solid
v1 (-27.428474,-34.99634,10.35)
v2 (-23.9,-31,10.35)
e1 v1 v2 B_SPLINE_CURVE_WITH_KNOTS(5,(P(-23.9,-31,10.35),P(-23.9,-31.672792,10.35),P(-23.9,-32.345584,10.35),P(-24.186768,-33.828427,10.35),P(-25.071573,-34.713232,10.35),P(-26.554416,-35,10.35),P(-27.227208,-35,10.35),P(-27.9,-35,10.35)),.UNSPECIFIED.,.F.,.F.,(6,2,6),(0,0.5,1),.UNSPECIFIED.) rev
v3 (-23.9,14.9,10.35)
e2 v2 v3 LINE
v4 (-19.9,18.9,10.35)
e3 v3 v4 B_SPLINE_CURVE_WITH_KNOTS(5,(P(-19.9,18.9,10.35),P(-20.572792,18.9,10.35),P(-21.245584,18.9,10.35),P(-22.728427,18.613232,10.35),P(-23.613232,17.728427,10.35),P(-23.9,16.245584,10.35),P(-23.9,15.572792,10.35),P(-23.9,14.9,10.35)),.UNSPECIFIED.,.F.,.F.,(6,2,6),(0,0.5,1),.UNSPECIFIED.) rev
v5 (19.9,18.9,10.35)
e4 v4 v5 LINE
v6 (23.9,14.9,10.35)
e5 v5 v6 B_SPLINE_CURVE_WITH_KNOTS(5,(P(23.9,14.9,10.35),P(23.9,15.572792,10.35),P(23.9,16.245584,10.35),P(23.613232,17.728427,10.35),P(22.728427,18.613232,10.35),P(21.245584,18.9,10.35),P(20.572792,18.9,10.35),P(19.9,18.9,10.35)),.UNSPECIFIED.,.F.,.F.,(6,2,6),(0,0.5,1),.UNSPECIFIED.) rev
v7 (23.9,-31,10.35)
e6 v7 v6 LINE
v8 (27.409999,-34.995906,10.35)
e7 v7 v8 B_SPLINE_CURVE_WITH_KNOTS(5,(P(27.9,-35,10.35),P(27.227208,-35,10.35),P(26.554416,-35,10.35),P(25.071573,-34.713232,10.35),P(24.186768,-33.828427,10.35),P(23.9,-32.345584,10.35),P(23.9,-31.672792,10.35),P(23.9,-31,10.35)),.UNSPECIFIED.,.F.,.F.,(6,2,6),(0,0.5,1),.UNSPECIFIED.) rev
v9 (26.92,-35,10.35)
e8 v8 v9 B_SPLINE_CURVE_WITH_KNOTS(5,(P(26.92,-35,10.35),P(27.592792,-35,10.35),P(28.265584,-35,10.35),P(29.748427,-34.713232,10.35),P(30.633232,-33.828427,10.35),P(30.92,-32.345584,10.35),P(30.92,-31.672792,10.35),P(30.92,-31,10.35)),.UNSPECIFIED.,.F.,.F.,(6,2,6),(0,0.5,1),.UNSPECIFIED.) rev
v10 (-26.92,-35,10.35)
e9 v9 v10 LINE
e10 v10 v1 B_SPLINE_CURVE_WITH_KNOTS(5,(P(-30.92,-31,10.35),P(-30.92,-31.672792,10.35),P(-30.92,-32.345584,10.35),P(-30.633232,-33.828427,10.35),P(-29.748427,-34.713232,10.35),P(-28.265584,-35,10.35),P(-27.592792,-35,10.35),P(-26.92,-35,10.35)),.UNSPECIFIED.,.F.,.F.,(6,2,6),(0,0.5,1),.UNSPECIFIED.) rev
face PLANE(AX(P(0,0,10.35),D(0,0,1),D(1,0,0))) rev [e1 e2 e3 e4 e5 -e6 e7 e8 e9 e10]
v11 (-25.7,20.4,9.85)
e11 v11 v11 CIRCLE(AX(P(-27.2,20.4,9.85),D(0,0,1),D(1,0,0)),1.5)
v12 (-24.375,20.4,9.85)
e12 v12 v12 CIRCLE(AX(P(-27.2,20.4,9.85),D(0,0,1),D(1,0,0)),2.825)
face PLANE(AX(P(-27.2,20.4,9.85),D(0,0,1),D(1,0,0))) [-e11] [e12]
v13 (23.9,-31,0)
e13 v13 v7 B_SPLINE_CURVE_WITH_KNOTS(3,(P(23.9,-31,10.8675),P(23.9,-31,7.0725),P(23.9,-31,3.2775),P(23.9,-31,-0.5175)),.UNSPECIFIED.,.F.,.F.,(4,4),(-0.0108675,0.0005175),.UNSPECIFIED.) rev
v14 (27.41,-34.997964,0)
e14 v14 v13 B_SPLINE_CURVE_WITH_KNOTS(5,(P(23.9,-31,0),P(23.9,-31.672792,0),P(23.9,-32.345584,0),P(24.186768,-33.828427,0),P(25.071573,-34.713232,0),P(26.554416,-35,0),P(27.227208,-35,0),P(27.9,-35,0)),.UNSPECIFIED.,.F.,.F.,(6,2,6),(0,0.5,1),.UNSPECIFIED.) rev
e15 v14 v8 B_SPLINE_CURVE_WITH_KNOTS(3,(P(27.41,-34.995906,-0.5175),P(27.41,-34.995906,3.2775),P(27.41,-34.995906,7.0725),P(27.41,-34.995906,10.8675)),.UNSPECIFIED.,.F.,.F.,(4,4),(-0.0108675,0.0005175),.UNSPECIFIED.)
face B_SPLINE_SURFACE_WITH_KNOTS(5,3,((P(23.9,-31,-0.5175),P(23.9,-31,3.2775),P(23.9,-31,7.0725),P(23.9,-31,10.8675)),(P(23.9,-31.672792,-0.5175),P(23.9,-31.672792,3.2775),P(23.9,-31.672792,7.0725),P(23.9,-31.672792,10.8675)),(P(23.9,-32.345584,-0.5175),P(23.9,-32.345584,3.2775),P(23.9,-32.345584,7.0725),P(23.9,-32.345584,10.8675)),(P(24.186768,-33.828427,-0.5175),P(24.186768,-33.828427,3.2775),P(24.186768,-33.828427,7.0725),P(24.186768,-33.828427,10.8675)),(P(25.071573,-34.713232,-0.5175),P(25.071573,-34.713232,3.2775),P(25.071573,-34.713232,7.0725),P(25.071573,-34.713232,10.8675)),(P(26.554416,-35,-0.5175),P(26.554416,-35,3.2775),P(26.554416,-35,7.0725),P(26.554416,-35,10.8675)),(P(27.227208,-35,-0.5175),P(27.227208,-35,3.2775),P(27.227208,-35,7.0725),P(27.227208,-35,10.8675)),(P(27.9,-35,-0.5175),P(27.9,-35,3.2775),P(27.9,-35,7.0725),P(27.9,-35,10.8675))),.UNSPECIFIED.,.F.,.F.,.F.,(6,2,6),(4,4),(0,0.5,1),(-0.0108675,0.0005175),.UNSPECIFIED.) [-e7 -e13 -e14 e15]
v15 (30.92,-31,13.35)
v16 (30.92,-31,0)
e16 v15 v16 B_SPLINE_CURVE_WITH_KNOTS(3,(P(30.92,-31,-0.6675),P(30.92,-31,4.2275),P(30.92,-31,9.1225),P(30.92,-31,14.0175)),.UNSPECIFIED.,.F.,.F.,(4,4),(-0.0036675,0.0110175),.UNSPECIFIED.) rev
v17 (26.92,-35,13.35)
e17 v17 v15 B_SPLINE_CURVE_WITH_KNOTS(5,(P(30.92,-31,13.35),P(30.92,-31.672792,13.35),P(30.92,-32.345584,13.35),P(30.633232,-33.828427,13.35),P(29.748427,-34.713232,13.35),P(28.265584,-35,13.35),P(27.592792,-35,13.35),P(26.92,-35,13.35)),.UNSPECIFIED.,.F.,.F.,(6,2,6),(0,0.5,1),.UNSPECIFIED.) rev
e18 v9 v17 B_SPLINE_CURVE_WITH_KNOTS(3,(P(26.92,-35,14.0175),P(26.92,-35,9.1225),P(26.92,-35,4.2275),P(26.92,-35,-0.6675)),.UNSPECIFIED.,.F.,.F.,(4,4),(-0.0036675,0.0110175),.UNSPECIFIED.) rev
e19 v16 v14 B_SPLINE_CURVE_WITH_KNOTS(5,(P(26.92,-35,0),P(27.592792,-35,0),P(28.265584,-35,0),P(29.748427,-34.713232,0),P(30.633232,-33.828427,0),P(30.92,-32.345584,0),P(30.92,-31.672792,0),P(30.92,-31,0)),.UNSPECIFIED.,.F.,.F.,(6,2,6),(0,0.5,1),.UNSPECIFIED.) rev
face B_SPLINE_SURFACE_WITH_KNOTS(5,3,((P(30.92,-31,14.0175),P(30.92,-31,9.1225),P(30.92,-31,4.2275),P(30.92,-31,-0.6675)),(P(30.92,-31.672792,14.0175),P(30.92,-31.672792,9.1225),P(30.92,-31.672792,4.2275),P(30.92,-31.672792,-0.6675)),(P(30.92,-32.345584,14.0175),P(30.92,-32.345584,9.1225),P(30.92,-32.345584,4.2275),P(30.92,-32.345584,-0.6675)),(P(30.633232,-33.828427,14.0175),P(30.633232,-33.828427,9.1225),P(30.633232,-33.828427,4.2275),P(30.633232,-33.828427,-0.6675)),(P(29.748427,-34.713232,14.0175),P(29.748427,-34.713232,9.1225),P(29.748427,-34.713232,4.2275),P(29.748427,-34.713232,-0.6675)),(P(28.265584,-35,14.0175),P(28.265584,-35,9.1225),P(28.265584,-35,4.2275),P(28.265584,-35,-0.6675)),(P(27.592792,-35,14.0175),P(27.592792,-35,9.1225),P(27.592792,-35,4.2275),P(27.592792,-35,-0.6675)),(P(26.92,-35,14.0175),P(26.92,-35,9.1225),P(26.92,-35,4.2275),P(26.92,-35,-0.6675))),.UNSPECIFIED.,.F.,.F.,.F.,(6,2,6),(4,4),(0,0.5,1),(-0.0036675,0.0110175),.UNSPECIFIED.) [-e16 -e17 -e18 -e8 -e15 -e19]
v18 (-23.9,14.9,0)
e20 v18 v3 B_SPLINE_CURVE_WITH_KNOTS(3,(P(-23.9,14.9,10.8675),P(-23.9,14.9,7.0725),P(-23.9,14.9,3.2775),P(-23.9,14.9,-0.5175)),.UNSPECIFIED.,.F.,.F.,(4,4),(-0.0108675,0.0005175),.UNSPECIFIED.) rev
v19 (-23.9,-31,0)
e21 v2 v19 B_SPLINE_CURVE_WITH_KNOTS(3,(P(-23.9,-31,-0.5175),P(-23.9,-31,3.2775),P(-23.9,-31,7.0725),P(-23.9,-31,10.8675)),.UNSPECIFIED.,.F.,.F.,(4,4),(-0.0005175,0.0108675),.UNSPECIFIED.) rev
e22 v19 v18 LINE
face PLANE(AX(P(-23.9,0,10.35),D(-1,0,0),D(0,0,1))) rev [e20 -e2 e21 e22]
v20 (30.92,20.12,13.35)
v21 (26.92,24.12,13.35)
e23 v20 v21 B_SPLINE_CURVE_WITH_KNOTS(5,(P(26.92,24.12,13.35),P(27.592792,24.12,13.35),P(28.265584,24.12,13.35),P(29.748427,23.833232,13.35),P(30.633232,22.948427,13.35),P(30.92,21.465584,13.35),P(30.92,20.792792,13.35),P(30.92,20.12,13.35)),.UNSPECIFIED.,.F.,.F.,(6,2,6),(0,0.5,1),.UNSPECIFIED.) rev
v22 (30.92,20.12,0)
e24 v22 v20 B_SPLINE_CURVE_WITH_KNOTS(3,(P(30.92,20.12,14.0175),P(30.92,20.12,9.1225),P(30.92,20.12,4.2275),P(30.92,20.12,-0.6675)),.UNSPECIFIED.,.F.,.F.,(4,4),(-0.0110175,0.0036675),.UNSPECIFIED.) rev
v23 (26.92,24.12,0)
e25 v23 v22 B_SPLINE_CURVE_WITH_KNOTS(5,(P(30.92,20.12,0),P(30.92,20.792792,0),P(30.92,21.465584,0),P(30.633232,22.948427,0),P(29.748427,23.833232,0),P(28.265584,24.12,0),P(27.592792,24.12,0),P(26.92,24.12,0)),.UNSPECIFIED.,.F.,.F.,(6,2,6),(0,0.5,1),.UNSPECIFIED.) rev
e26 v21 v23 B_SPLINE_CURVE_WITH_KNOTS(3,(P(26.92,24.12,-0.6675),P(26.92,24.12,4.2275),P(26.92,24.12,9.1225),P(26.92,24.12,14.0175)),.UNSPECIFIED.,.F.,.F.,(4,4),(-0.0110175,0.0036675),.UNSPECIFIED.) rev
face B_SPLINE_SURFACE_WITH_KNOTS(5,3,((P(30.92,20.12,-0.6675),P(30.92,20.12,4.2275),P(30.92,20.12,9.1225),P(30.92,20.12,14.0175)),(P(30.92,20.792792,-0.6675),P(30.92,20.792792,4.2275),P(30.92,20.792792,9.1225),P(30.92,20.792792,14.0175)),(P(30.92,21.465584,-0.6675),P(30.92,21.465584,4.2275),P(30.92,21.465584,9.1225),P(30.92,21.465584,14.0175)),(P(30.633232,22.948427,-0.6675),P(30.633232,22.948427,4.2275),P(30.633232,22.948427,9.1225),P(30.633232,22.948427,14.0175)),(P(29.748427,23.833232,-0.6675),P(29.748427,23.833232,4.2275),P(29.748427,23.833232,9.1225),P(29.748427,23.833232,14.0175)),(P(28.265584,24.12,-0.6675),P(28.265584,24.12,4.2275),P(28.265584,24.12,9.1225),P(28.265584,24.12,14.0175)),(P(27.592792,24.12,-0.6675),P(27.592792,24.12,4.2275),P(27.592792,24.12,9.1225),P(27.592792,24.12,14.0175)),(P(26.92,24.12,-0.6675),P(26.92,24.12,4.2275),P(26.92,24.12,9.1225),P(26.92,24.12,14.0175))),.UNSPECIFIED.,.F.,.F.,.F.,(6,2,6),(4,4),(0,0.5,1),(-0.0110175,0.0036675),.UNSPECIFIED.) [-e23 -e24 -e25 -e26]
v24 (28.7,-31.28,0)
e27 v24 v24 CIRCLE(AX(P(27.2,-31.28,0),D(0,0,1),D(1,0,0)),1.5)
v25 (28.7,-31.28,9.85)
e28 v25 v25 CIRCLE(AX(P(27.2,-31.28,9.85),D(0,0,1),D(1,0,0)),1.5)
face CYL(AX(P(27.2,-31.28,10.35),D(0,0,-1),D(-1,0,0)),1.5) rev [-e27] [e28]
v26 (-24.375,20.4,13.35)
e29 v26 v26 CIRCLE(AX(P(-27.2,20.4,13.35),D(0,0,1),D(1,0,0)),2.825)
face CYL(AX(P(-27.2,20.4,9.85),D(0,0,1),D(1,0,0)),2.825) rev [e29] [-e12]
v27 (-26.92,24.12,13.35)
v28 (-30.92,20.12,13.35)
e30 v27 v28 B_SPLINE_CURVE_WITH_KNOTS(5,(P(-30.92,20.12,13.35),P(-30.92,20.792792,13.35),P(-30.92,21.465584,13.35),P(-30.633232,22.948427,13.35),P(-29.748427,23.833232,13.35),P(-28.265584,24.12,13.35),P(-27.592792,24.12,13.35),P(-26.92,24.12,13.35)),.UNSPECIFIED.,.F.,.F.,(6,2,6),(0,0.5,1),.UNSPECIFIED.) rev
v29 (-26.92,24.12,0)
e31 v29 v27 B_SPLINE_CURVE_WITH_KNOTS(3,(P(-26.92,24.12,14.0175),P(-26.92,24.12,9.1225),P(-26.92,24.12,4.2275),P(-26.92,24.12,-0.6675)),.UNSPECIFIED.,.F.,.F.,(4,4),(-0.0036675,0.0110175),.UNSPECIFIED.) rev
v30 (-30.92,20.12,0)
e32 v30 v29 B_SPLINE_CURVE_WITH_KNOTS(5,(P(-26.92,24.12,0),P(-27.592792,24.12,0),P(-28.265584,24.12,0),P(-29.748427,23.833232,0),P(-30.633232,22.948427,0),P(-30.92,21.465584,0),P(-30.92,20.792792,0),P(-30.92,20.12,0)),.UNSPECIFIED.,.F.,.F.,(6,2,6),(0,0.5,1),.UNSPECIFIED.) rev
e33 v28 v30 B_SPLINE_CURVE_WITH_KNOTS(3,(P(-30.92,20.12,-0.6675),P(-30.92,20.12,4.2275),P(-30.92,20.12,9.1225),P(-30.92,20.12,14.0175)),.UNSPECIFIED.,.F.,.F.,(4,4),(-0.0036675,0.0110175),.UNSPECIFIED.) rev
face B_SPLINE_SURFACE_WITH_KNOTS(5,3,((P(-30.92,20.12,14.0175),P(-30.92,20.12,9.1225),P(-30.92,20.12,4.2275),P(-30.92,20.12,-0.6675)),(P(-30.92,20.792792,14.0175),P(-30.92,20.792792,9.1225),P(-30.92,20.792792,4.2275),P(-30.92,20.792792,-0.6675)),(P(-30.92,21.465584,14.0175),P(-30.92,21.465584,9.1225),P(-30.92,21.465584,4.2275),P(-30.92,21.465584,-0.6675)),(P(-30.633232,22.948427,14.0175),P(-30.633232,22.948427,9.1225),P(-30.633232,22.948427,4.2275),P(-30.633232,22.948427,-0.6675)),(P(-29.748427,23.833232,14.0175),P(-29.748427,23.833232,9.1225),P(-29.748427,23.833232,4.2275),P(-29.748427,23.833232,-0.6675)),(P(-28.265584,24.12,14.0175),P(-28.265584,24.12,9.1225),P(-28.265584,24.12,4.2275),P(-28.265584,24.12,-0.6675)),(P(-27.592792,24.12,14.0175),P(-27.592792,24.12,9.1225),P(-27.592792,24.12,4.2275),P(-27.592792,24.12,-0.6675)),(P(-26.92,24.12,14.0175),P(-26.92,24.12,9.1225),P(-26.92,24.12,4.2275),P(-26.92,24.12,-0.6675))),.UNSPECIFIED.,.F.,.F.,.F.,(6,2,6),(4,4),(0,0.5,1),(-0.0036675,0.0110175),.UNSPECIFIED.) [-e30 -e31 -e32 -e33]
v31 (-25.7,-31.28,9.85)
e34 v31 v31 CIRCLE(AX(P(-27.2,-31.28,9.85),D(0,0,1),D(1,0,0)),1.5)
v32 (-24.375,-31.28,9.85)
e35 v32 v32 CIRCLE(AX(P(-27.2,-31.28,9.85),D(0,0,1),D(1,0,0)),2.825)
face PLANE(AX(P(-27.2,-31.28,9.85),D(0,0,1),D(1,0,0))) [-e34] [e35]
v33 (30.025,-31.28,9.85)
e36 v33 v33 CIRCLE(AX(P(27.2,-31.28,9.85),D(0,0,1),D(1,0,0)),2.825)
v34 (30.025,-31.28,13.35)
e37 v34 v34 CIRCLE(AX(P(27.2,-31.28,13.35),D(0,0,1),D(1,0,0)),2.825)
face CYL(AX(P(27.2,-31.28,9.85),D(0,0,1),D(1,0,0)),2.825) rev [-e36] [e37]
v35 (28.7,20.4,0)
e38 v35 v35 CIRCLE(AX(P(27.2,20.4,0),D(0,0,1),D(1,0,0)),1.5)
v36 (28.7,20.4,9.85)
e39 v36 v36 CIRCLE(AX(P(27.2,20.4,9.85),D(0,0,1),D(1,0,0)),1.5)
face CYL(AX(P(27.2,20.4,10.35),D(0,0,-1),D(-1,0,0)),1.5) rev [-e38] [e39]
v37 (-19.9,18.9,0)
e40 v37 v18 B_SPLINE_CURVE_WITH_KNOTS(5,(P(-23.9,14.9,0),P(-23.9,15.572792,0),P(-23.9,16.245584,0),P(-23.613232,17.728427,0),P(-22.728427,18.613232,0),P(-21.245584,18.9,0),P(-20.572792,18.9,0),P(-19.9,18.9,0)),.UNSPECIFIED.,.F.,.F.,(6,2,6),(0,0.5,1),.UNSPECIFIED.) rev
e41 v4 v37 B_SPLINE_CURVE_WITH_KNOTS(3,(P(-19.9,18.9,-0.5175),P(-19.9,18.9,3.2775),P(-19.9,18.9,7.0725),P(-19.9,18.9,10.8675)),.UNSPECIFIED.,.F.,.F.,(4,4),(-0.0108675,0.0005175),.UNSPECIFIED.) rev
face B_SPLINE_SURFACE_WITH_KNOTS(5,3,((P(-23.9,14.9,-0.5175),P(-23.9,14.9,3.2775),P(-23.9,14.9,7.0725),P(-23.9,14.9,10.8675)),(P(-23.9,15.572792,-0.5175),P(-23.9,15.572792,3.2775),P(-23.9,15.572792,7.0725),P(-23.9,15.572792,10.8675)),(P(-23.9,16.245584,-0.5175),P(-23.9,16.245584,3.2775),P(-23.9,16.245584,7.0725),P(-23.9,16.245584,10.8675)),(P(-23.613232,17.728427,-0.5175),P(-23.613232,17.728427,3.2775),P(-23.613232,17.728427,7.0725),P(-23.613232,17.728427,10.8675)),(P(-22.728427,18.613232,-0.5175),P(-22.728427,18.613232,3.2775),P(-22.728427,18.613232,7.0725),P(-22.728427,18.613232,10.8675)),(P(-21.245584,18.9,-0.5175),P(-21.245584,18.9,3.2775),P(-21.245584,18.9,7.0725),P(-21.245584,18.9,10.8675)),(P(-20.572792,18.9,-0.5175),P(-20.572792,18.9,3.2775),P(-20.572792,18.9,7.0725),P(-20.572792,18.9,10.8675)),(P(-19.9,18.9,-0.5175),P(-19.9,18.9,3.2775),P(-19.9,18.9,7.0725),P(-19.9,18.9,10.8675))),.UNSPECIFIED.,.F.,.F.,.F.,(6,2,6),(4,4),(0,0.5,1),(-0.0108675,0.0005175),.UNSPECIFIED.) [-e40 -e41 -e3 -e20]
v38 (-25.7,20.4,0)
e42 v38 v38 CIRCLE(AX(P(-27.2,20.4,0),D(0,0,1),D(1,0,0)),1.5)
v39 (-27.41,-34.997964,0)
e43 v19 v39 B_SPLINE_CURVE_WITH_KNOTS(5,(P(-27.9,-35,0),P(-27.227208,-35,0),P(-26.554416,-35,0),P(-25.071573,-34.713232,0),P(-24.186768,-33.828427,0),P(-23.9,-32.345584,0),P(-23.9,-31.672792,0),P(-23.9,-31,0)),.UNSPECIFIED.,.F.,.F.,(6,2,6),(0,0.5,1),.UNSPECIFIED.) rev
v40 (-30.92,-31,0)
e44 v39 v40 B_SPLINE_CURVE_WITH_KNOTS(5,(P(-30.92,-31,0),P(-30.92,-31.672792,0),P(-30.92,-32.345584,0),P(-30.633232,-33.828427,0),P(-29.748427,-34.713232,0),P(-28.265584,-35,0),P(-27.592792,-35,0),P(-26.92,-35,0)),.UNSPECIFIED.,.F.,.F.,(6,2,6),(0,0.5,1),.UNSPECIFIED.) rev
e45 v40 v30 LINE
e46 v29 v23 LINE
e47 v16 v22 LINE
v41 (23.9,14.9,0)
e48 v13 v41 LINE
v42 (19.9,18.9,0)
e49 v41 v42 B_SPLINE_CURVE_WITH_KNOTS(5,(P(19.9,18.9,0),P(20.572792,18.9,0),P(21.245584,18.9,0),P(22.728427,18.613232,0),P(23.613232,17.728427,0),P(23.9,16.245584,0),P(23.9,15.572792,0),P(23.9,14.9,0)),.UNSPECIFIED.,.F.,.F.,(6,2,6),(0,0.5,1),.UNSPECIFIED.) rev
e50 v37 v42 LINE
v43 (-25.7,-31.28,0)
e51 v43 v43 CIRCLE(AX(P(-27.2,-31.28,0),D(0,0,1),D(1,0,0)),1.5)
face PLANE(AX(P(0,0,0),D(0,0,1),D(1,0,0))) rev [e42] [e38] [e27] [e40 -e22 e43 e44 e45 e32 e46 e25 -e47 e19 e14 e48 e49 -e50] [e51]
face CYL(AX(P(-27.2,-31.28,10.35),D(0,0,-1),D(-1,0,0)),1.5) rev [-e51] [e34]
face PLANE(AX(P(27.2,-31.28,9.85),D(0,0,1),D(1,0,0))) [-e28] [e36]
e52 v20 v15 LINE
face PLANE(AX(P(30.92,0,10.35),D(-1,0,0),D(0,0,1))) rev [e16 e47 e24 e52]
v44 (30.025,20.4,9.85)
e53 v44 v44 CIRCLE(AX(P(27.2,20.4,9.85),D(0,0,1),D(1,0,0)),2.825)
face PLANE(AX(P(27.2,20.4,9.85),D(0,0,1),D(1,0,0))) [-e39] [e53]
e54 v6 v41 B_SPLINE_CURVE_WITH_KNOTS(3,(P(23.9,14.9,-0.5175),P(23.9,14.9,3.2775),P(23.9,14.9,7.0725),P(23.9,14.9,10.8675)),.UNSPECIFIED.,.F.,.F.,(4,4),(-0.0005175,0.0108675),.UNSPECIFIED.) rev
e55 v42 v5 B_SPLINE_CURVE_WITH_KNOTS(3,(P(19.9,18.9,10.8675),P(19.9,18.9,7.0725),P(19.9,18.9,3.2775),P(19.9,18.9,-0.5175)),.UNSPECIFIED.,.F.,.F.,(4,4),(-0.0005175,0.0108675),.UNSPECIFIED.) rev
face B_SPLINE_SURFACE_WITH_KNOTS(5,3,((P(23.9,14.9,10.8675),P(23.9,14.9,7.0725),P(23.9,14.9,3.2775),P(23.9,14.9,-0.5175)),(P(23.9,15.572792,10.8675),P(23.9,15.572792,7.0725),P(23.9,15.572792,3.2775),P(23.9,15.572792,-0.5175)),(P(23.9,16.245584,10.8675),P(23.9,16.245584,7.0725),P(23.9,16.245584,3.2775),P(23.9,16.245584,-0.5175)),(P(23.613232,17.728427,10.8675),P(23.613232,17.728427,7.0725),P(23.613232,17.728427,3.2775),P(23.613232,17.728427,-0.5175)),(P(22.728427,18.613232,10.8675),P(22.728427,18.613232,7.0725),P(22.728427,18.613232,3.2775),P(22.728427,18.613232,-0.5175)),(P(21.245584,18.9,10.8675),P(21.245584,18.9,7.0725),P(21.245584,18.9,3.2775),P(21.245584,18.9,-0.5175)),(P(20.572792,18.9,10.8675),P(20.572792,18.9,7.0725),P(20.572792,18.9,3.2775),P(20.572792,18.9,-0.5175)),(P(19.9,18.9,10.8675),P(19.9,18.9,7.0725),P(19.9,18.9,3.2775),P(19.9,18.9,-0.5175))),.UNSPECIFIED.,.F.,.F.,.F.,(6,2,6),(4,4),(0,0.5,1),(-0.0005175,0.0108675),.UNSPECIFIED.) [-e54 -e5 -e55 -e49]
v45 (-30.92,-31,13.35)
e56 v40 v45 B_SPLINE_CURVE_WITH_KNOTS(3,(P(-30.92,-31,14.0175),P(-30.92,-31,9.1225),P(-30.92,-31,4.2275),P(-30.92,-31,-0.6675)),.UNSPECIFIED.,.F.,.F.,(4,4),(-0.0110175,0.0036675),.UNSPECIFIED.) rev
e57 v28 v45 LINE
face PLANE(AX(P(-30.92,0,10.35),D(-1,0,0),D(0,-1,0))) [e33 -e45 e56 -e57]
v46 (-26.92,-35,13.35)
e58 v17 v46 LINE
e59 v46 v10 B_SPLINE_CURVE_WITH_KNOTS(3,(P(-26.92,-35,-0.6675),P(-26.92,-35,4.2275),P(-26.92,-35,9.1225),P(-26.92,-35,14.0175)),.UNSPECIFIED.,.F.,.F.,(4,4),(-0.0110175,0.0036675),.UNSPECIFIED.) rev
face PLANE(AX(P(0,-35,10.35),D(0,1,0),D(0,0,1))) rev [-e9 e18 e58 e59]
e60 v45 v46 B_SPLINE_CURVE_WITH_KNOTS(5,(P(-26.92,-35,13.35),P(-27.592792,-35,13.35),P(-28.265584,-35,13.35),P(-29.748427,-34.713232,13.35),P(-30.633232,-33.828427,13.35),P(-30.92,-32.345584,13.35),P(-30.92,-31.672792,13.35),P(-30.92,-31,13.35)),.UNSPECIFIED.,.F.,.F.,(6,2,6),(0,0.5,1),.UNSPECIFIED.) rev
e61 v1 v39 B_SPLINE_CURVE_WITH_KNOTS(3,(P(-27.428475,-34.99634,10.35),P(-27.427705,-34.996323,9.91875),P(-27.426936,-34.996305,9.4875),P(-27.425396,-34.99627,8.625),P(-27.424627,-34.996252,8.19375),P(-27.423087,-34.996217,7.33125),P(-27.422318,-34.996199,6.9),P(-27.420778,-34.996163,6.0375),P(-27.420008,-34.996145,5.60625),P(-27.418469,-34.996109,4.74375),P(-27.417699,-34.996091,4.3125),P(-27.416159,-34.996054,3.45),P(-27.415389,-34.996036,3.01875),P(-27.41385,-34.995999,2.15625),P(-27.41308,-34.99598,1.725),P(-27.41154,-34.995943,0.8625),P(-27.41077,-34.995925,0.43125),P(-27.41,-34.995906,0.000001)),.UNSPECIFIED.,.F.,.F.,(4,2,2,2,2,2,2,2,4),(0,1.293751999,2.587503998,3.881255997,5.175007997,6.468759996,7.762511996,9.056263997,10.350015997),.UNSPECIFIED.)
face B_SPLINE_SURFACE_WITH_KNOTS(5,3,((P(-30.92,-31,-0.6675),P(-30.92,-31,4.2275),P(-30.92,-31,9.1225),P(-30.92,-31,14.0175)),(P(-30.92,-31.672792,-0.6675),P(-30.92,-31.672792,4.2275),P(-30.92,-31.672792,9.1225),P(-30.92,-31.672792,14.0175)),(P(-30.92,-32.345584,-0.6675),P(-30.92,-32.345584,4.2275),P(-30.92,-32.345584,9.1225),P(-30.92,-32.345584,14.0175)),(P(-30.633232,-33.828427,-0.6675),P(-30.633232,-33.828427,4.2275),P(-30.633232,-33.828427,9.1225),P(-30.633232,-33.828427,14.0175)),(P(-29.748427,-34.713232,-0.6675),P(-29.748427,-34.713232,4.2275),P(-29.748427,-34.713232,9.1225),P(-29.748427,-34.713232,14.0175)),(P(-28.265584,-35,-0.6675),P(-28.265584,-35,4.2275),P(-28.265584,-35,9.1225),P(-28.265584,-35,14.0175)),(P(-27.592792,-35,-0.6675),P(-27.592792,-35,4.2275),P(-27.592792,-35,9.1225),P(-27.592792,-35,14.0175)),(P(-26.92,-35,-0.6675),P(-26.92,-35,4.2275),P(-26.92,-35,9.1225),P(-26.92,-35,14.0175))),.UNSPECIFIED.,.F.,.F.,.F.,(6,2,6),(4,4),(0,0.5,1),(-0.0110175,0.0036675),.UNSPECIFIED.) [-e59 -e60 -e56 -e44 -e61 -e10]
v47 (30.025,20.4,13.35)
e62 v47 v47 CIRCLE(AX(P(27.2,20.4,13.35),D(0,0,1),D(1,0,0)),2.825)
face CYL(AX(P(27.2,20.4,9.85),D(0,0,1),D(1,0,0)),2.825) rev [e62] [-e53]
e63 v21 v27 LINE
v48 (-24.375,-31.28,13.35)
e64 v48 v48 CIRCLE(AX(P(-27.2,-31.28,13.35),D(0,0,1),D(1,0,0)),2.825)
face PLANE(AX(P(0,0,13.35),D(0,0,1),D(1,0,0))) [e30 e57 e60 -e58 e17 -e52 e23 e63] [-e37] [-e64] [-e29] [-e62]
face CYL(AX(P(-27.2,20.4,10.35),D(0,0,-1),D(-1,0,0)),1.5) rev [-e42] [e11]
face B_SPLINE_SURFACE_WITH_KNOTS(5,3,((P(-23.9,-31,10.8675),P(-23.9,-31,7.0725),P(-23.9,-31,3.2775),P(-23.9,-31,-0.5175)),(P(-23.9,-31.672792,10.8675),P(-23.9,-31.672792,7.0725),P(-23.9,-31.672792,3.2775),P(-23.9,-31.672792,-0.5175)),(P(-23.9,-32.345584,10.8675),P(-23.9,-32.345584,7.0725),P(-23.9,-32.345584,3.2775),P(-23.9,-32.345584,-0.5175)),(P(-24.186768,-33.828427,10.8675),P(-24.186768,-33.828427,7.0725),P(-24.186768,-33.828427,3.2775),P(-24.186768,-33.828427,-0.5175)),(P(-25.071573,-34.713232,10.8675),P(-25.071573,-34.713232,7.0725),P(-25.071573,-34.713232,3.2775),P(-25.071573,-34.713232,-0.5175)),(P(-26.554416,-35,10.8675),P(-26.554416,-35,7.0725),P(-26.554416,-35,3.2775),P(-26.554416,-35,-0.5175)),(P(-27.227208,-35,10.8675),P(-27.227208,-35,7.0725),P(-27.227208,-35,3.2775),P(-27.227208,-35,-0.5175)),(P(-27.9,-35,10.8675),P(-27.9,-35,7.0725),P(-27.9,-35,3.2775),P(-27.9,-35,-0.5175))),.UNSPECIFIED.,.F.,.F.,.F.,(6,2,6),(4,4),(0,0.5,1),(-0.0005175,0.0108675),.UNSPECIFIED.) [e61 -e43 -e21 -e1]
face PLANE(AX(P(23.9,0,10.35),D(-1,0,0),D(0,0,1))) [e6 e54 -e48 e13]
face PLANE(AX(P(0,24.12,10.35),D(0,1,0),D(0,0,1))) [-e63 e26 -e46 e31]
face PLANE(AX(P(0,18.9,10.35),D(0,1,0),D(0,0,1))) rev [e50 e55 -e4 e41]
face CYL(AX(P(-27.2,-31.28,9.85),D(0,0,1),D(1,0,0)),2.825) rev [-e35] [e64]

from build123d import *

# Parameters (mm, degrees)
SKETCH2_R           = 1.5
BOSS_EXTRUDE1_DEPTH = 10.35
BOSS_EXTRUDE2_START = 10.35
SKETCH2_3_R         = 1.5
BOSS_EXTRUDE2_DEPTH = 3
FILLET1_SIZE        = 4
FILLET2_SIZE        = 4
SKETCH7_R           = 2.825
CUT_EXTRUDE1_DEPTH  = 3.5


with BuildPart() as part:
    # Sketch2 → Boss-Extrude1 (new body)
    with BuildSketch(Plane.XY):
        Polygon((-30.92, -35), (-23.9, -35), (-23.9, 18.9), (23.9, 18.9), (23.9, -35), (30.92, -35), (30.92, 24.12), (-30.92, 24.12), align=None)
        with Locations((-27.2, -31.28)):
            Circle(SKETCH2_R, mode=Mode.SUBTRACT)
        with Locations((27.2, -31.28)):
            Circle(SKETCH2_R, mode=Mode.SUBTRACT)
        with Locations((-27.2, 20.4)):
            Circle(SKETCH2_R, mode=Mode.SUBTRACT)
        with Locations((27.2, 20.4)):
            Circle(SKETCH2_R, mode=Mode.SUBTRACT)
    extrude(amount=BOSS_EXTRUDE1_DEPTH)

    # Sketch2<3> → Boss-Extrude2 (add)
    # profile 1 of 2: a face of its own
    with BuildSketch(Plane.XY.offset(BOSS_EXTRUDE2_START)):
        Polygon((-30.92, -35), (-23.9, -35), (-23.9, 18.9), (23.9, 18.9), (23.9, -35), (30.92, -35), (30.92, 24.12), (-30.92, 24.12), align=None)
        with Locations((-27.2, -31.28)):
            Circle(SKETCH2_3_R, mode=Mode.SUBTRACT)
        with Locations((27.2, -31.28)):
            Circle(SKETCH2_3_R, mode=Mode.SUBTRACT)
        with Locations((-27.2, 20.4)):
            Circle(SKETCH2_3_R, mode=Mode.SUBTRACT)
        with Locations((27.2, 20.4)):
            Circle(SKETCH2_3_R, mode=Mode.SUBTRACT)
    # profile 2 of 2: a face of its own
    with BuildSketch(Plane.XY.offset(BOSS_EXTRUDE2_START)):
        Polygon((-23.9, -35), (-16, -35), (16, -35), (23.9, -35), (23.9, 18.9), (-23.9, 18.9), align=None)
    extrude(amount=BOSS_EXTRUDE2_DEPTH)

    # Fillet1
    # a fillet whose section is not a circle: 4 mm, written as the material it adds along each edge
    with BuildSketch(Plane(origin=(-23.9, 18.9, 0), x_dir=(0, -1, 0), z_dir=(0, 0, 1))) as fillet1_piece_1_section:
        with BuildLine():
            add(Edge.make_bspline([(FILLET1_SIZE, 0), (FILLET1_SIZE * 0.831801948466, 0), (FILLET1_SIZE * 0.663603896932, 0), (FILLET1_SIZE * 0.292893218813, FILLET1_SIZE * 0.0716919198361), (FILLET1_SIZE * 0.0716919198361, FILLET1_SIZE * 0.292893218813), (0, FILLET1_SIZE * 0.663603896932), (0, FILLET1_SIZE * 0.831801948466), (0, FILLET1_SIZE)], knots=[0, 0, 0, 0, 0, 0, 0.5, 0.5, 1, 1, 1, 1, 1, 1], degree=5))
            Line((0, FILLET1_SIZE), (0, 0))
            Line((0, 0), (FILLET1_SIZE, 0))
        make_face()
    fillet1_piece_1 = extrude(amount=20.35, mode=Mode.PRIVATE)
    fillet1_piece_1 = split(fillet1_piece_1, bisect_by=Plane(origin=(-23.9, 18.9, 13.35), z_dir=(0, 0, -1)), keep=Keep.TOP, mode=Mode.PRIVATE)
    add(fillet1_piece_1)
    with BuildSketch(Plane(origin=(23.9, 18.9, 0), x_dir=(-1, 0, 0), z_dir=(0, 0, 1))) as fillet1_piece_2_section:
        with BuildLine():
            add(Edge.make_bspline([(FILLET1_SIZE, 0), (FILLET1_SIZE * 0.831801948466, 0), (FILLET1_SIZE * 0.663603896932, 0), (FILLET1_SIZE * 0.292893218813, FILLET1_SIZE * 0.0716919198361), (FILLET1_SIZE * 0.0716919198361, FILLET1_SIZE * 0.292893218813), (0, FILLET1_SIZE * 0.663603896932), (0, FILLET1_SIZE * 0.831801948466), (0, FILLET1_SIZE)], knots=[0, 0, 0, 0, 0, 0, 0.5, 0.5, 1, 1, 1, 1, 1, 1], degree=5))
            Line((0, FILLET1_SIZE), (0, 0))
            Line((0, 0), (FILLET1_SIZE, 0))
        make_face()
    fillet1_piece_2 = extrude(amount=20.35, mode=Mode.PRIVATE)
    fillet1_piece_2 = split(fillet1_piece_2, bisect_by=Plane(origin=(23.9, 18.9, 13.35), z_dir=(0, 0, -1)), keep=Keep.TOP, mode=Mode.PRIVATE)
    add(fillet1_piece_2)

    # Fillet2
    # a fillet whose section is not a circle: 4 mm, written as the material it takes off along each edge
    with BuildSketch(Plane(origin=(23.9, -35, -10), x_dir=(0, 1, 0), z_dir=(0, 0, 1)), Plane(origin=(-23.9, -35, -10), x_dir=(-1, 0, 0), z_dir=(0, 0, 1))) as fillet2_piece_1:
        with BuildLine():
            add(Edge.make_bspline([(FILLET2_SIZE, 0), (FILLET2_SIZE * 0.831801948466, 0), (FILLET2_SIZE * 0.663603896932, 0), (FILLET2_SIZE * 0.292893218813, -FILLET2_SIZE * 0.0716919198361), (FILLET2_SIZE * 0.0716919198361, -FILLET2_SIZE * 0.292893218813), (0, -FILLET2_SIZE * 0.663603896932), (0, -FILLET2_SIZE * 0.831801948466), (0, -FILLET2_SIZE)], knots=[0, 0, 0, 0, 0, 0, 0.5, 0.5, 1, 1, 1, 1, 1, 1], degree=5))
            Line((0, -FILLET2_SIZE), (0, 0))
            Line((0, 0), (FILLET2_SIZE, 0))
        make_face()
    extrude(amount=20.35, mode=Mode.SUBTRACT)
    with BuildSketch(Plane(origin=(-30.92, -35, 23.35), x_dir=(1, 0, 0), z_dir=(0, 0, -1)), Plane(origin=(30.92, -35, -10), x_dir=(-1, 0, 0), z_dir=(0, 0, 1))) as fillet2_piece_2:
        with BuildLine():
            add(Edge.make_bspline([(FILLET2_SIZE, 0), (FILLET2_SIZE * 0.831801948466, 0), (FILLET2_SIZE * 0.663603896932, 0), (FILLET2_SIZE * 0.292893218813, -FILLET2_SIZE * 0.0716919198361), (FILLET2_SIZE * 0.0716919198361, -FILLET2_SIZE * 0.292893218813), (0, -FILLET2_SIZE * 0.663603896932), (0, -FILLET2_SIZE * 0.831801948466), (0, -FILLET2_SIZE)], knots=[0, 0, 0, 0, 0, 0, 0.5, 0.5, 1, 1, 1, 1, 1, 1], degree=5))
            Line((0, -FILLET2_SIZE), (0, 0))
            Line((0, 0), (FILLET2_SIZE, 0))
        make_face()
    extrude(amount=33.35, mode=Mode.SUBTRACT)
    with BuildSketch(Plane(origin=(30.92, 24.12, 23.35), x_dir=(0, -1, 0), z_dir=(0, 0, -1)), Plane(origin=(-30.92, 24.12, 23.35), x_dir=(1, 0, 0), z_dir=(0, 0, -1))) as fillet2_piece_3:
        with BuildLine():
            add(Edge.make_bspline([(FILLET2_SIZE, 0), (FILLET2_SIZE * 0.831801948466, 0), (FILLET2_SIZE * 0.663603896932, 0), (FILLET2_SIZE * 0.292893218813, FILLET2_SIZE * 0.0716919198361), (FILLET2_SIZE * 0.0716919198361, FILLET2_SIZE * 0.292893218813), (0, FILLET2_SIZE * 0.663603896932), (0, FILLET2_SIZE * 0.831801948466), (0, FILLET2_SIZE)], knots=[0, 0, 0, 0, 0, 0, 0.5, 0.5, 1, 1, 1, 1, 1, 1], degree=5))
            Line((0, FILLET2_SIZE), (0, 0))
            Line((0, 0), (FILLET2_SIZE, 0))
        make_face()
    extrude(amount=33.35, mode=Mode.SUBTRACT)

    # Sketch7 → Cut-Extrude1 (cut)
    with BuildSketch(Plane.XY.offset(13.35)):
        with Locations((-27.2, 20.4)):
            Circle(SKETCH7_R)
        with Locations((27.2, 20.4)):
            Circle(SKETCH7_R)
        with Locations((27.2, -31.28)):
            Circle(SKETCH7_R)
        with Locations((-27.2, -31.28)):
            Circle(SKETCH7_R)
    extrude(amount=-CUT_EXTRUDE1_DEPTH, mode=Mode.SUBTRACT)


solid = part.part
